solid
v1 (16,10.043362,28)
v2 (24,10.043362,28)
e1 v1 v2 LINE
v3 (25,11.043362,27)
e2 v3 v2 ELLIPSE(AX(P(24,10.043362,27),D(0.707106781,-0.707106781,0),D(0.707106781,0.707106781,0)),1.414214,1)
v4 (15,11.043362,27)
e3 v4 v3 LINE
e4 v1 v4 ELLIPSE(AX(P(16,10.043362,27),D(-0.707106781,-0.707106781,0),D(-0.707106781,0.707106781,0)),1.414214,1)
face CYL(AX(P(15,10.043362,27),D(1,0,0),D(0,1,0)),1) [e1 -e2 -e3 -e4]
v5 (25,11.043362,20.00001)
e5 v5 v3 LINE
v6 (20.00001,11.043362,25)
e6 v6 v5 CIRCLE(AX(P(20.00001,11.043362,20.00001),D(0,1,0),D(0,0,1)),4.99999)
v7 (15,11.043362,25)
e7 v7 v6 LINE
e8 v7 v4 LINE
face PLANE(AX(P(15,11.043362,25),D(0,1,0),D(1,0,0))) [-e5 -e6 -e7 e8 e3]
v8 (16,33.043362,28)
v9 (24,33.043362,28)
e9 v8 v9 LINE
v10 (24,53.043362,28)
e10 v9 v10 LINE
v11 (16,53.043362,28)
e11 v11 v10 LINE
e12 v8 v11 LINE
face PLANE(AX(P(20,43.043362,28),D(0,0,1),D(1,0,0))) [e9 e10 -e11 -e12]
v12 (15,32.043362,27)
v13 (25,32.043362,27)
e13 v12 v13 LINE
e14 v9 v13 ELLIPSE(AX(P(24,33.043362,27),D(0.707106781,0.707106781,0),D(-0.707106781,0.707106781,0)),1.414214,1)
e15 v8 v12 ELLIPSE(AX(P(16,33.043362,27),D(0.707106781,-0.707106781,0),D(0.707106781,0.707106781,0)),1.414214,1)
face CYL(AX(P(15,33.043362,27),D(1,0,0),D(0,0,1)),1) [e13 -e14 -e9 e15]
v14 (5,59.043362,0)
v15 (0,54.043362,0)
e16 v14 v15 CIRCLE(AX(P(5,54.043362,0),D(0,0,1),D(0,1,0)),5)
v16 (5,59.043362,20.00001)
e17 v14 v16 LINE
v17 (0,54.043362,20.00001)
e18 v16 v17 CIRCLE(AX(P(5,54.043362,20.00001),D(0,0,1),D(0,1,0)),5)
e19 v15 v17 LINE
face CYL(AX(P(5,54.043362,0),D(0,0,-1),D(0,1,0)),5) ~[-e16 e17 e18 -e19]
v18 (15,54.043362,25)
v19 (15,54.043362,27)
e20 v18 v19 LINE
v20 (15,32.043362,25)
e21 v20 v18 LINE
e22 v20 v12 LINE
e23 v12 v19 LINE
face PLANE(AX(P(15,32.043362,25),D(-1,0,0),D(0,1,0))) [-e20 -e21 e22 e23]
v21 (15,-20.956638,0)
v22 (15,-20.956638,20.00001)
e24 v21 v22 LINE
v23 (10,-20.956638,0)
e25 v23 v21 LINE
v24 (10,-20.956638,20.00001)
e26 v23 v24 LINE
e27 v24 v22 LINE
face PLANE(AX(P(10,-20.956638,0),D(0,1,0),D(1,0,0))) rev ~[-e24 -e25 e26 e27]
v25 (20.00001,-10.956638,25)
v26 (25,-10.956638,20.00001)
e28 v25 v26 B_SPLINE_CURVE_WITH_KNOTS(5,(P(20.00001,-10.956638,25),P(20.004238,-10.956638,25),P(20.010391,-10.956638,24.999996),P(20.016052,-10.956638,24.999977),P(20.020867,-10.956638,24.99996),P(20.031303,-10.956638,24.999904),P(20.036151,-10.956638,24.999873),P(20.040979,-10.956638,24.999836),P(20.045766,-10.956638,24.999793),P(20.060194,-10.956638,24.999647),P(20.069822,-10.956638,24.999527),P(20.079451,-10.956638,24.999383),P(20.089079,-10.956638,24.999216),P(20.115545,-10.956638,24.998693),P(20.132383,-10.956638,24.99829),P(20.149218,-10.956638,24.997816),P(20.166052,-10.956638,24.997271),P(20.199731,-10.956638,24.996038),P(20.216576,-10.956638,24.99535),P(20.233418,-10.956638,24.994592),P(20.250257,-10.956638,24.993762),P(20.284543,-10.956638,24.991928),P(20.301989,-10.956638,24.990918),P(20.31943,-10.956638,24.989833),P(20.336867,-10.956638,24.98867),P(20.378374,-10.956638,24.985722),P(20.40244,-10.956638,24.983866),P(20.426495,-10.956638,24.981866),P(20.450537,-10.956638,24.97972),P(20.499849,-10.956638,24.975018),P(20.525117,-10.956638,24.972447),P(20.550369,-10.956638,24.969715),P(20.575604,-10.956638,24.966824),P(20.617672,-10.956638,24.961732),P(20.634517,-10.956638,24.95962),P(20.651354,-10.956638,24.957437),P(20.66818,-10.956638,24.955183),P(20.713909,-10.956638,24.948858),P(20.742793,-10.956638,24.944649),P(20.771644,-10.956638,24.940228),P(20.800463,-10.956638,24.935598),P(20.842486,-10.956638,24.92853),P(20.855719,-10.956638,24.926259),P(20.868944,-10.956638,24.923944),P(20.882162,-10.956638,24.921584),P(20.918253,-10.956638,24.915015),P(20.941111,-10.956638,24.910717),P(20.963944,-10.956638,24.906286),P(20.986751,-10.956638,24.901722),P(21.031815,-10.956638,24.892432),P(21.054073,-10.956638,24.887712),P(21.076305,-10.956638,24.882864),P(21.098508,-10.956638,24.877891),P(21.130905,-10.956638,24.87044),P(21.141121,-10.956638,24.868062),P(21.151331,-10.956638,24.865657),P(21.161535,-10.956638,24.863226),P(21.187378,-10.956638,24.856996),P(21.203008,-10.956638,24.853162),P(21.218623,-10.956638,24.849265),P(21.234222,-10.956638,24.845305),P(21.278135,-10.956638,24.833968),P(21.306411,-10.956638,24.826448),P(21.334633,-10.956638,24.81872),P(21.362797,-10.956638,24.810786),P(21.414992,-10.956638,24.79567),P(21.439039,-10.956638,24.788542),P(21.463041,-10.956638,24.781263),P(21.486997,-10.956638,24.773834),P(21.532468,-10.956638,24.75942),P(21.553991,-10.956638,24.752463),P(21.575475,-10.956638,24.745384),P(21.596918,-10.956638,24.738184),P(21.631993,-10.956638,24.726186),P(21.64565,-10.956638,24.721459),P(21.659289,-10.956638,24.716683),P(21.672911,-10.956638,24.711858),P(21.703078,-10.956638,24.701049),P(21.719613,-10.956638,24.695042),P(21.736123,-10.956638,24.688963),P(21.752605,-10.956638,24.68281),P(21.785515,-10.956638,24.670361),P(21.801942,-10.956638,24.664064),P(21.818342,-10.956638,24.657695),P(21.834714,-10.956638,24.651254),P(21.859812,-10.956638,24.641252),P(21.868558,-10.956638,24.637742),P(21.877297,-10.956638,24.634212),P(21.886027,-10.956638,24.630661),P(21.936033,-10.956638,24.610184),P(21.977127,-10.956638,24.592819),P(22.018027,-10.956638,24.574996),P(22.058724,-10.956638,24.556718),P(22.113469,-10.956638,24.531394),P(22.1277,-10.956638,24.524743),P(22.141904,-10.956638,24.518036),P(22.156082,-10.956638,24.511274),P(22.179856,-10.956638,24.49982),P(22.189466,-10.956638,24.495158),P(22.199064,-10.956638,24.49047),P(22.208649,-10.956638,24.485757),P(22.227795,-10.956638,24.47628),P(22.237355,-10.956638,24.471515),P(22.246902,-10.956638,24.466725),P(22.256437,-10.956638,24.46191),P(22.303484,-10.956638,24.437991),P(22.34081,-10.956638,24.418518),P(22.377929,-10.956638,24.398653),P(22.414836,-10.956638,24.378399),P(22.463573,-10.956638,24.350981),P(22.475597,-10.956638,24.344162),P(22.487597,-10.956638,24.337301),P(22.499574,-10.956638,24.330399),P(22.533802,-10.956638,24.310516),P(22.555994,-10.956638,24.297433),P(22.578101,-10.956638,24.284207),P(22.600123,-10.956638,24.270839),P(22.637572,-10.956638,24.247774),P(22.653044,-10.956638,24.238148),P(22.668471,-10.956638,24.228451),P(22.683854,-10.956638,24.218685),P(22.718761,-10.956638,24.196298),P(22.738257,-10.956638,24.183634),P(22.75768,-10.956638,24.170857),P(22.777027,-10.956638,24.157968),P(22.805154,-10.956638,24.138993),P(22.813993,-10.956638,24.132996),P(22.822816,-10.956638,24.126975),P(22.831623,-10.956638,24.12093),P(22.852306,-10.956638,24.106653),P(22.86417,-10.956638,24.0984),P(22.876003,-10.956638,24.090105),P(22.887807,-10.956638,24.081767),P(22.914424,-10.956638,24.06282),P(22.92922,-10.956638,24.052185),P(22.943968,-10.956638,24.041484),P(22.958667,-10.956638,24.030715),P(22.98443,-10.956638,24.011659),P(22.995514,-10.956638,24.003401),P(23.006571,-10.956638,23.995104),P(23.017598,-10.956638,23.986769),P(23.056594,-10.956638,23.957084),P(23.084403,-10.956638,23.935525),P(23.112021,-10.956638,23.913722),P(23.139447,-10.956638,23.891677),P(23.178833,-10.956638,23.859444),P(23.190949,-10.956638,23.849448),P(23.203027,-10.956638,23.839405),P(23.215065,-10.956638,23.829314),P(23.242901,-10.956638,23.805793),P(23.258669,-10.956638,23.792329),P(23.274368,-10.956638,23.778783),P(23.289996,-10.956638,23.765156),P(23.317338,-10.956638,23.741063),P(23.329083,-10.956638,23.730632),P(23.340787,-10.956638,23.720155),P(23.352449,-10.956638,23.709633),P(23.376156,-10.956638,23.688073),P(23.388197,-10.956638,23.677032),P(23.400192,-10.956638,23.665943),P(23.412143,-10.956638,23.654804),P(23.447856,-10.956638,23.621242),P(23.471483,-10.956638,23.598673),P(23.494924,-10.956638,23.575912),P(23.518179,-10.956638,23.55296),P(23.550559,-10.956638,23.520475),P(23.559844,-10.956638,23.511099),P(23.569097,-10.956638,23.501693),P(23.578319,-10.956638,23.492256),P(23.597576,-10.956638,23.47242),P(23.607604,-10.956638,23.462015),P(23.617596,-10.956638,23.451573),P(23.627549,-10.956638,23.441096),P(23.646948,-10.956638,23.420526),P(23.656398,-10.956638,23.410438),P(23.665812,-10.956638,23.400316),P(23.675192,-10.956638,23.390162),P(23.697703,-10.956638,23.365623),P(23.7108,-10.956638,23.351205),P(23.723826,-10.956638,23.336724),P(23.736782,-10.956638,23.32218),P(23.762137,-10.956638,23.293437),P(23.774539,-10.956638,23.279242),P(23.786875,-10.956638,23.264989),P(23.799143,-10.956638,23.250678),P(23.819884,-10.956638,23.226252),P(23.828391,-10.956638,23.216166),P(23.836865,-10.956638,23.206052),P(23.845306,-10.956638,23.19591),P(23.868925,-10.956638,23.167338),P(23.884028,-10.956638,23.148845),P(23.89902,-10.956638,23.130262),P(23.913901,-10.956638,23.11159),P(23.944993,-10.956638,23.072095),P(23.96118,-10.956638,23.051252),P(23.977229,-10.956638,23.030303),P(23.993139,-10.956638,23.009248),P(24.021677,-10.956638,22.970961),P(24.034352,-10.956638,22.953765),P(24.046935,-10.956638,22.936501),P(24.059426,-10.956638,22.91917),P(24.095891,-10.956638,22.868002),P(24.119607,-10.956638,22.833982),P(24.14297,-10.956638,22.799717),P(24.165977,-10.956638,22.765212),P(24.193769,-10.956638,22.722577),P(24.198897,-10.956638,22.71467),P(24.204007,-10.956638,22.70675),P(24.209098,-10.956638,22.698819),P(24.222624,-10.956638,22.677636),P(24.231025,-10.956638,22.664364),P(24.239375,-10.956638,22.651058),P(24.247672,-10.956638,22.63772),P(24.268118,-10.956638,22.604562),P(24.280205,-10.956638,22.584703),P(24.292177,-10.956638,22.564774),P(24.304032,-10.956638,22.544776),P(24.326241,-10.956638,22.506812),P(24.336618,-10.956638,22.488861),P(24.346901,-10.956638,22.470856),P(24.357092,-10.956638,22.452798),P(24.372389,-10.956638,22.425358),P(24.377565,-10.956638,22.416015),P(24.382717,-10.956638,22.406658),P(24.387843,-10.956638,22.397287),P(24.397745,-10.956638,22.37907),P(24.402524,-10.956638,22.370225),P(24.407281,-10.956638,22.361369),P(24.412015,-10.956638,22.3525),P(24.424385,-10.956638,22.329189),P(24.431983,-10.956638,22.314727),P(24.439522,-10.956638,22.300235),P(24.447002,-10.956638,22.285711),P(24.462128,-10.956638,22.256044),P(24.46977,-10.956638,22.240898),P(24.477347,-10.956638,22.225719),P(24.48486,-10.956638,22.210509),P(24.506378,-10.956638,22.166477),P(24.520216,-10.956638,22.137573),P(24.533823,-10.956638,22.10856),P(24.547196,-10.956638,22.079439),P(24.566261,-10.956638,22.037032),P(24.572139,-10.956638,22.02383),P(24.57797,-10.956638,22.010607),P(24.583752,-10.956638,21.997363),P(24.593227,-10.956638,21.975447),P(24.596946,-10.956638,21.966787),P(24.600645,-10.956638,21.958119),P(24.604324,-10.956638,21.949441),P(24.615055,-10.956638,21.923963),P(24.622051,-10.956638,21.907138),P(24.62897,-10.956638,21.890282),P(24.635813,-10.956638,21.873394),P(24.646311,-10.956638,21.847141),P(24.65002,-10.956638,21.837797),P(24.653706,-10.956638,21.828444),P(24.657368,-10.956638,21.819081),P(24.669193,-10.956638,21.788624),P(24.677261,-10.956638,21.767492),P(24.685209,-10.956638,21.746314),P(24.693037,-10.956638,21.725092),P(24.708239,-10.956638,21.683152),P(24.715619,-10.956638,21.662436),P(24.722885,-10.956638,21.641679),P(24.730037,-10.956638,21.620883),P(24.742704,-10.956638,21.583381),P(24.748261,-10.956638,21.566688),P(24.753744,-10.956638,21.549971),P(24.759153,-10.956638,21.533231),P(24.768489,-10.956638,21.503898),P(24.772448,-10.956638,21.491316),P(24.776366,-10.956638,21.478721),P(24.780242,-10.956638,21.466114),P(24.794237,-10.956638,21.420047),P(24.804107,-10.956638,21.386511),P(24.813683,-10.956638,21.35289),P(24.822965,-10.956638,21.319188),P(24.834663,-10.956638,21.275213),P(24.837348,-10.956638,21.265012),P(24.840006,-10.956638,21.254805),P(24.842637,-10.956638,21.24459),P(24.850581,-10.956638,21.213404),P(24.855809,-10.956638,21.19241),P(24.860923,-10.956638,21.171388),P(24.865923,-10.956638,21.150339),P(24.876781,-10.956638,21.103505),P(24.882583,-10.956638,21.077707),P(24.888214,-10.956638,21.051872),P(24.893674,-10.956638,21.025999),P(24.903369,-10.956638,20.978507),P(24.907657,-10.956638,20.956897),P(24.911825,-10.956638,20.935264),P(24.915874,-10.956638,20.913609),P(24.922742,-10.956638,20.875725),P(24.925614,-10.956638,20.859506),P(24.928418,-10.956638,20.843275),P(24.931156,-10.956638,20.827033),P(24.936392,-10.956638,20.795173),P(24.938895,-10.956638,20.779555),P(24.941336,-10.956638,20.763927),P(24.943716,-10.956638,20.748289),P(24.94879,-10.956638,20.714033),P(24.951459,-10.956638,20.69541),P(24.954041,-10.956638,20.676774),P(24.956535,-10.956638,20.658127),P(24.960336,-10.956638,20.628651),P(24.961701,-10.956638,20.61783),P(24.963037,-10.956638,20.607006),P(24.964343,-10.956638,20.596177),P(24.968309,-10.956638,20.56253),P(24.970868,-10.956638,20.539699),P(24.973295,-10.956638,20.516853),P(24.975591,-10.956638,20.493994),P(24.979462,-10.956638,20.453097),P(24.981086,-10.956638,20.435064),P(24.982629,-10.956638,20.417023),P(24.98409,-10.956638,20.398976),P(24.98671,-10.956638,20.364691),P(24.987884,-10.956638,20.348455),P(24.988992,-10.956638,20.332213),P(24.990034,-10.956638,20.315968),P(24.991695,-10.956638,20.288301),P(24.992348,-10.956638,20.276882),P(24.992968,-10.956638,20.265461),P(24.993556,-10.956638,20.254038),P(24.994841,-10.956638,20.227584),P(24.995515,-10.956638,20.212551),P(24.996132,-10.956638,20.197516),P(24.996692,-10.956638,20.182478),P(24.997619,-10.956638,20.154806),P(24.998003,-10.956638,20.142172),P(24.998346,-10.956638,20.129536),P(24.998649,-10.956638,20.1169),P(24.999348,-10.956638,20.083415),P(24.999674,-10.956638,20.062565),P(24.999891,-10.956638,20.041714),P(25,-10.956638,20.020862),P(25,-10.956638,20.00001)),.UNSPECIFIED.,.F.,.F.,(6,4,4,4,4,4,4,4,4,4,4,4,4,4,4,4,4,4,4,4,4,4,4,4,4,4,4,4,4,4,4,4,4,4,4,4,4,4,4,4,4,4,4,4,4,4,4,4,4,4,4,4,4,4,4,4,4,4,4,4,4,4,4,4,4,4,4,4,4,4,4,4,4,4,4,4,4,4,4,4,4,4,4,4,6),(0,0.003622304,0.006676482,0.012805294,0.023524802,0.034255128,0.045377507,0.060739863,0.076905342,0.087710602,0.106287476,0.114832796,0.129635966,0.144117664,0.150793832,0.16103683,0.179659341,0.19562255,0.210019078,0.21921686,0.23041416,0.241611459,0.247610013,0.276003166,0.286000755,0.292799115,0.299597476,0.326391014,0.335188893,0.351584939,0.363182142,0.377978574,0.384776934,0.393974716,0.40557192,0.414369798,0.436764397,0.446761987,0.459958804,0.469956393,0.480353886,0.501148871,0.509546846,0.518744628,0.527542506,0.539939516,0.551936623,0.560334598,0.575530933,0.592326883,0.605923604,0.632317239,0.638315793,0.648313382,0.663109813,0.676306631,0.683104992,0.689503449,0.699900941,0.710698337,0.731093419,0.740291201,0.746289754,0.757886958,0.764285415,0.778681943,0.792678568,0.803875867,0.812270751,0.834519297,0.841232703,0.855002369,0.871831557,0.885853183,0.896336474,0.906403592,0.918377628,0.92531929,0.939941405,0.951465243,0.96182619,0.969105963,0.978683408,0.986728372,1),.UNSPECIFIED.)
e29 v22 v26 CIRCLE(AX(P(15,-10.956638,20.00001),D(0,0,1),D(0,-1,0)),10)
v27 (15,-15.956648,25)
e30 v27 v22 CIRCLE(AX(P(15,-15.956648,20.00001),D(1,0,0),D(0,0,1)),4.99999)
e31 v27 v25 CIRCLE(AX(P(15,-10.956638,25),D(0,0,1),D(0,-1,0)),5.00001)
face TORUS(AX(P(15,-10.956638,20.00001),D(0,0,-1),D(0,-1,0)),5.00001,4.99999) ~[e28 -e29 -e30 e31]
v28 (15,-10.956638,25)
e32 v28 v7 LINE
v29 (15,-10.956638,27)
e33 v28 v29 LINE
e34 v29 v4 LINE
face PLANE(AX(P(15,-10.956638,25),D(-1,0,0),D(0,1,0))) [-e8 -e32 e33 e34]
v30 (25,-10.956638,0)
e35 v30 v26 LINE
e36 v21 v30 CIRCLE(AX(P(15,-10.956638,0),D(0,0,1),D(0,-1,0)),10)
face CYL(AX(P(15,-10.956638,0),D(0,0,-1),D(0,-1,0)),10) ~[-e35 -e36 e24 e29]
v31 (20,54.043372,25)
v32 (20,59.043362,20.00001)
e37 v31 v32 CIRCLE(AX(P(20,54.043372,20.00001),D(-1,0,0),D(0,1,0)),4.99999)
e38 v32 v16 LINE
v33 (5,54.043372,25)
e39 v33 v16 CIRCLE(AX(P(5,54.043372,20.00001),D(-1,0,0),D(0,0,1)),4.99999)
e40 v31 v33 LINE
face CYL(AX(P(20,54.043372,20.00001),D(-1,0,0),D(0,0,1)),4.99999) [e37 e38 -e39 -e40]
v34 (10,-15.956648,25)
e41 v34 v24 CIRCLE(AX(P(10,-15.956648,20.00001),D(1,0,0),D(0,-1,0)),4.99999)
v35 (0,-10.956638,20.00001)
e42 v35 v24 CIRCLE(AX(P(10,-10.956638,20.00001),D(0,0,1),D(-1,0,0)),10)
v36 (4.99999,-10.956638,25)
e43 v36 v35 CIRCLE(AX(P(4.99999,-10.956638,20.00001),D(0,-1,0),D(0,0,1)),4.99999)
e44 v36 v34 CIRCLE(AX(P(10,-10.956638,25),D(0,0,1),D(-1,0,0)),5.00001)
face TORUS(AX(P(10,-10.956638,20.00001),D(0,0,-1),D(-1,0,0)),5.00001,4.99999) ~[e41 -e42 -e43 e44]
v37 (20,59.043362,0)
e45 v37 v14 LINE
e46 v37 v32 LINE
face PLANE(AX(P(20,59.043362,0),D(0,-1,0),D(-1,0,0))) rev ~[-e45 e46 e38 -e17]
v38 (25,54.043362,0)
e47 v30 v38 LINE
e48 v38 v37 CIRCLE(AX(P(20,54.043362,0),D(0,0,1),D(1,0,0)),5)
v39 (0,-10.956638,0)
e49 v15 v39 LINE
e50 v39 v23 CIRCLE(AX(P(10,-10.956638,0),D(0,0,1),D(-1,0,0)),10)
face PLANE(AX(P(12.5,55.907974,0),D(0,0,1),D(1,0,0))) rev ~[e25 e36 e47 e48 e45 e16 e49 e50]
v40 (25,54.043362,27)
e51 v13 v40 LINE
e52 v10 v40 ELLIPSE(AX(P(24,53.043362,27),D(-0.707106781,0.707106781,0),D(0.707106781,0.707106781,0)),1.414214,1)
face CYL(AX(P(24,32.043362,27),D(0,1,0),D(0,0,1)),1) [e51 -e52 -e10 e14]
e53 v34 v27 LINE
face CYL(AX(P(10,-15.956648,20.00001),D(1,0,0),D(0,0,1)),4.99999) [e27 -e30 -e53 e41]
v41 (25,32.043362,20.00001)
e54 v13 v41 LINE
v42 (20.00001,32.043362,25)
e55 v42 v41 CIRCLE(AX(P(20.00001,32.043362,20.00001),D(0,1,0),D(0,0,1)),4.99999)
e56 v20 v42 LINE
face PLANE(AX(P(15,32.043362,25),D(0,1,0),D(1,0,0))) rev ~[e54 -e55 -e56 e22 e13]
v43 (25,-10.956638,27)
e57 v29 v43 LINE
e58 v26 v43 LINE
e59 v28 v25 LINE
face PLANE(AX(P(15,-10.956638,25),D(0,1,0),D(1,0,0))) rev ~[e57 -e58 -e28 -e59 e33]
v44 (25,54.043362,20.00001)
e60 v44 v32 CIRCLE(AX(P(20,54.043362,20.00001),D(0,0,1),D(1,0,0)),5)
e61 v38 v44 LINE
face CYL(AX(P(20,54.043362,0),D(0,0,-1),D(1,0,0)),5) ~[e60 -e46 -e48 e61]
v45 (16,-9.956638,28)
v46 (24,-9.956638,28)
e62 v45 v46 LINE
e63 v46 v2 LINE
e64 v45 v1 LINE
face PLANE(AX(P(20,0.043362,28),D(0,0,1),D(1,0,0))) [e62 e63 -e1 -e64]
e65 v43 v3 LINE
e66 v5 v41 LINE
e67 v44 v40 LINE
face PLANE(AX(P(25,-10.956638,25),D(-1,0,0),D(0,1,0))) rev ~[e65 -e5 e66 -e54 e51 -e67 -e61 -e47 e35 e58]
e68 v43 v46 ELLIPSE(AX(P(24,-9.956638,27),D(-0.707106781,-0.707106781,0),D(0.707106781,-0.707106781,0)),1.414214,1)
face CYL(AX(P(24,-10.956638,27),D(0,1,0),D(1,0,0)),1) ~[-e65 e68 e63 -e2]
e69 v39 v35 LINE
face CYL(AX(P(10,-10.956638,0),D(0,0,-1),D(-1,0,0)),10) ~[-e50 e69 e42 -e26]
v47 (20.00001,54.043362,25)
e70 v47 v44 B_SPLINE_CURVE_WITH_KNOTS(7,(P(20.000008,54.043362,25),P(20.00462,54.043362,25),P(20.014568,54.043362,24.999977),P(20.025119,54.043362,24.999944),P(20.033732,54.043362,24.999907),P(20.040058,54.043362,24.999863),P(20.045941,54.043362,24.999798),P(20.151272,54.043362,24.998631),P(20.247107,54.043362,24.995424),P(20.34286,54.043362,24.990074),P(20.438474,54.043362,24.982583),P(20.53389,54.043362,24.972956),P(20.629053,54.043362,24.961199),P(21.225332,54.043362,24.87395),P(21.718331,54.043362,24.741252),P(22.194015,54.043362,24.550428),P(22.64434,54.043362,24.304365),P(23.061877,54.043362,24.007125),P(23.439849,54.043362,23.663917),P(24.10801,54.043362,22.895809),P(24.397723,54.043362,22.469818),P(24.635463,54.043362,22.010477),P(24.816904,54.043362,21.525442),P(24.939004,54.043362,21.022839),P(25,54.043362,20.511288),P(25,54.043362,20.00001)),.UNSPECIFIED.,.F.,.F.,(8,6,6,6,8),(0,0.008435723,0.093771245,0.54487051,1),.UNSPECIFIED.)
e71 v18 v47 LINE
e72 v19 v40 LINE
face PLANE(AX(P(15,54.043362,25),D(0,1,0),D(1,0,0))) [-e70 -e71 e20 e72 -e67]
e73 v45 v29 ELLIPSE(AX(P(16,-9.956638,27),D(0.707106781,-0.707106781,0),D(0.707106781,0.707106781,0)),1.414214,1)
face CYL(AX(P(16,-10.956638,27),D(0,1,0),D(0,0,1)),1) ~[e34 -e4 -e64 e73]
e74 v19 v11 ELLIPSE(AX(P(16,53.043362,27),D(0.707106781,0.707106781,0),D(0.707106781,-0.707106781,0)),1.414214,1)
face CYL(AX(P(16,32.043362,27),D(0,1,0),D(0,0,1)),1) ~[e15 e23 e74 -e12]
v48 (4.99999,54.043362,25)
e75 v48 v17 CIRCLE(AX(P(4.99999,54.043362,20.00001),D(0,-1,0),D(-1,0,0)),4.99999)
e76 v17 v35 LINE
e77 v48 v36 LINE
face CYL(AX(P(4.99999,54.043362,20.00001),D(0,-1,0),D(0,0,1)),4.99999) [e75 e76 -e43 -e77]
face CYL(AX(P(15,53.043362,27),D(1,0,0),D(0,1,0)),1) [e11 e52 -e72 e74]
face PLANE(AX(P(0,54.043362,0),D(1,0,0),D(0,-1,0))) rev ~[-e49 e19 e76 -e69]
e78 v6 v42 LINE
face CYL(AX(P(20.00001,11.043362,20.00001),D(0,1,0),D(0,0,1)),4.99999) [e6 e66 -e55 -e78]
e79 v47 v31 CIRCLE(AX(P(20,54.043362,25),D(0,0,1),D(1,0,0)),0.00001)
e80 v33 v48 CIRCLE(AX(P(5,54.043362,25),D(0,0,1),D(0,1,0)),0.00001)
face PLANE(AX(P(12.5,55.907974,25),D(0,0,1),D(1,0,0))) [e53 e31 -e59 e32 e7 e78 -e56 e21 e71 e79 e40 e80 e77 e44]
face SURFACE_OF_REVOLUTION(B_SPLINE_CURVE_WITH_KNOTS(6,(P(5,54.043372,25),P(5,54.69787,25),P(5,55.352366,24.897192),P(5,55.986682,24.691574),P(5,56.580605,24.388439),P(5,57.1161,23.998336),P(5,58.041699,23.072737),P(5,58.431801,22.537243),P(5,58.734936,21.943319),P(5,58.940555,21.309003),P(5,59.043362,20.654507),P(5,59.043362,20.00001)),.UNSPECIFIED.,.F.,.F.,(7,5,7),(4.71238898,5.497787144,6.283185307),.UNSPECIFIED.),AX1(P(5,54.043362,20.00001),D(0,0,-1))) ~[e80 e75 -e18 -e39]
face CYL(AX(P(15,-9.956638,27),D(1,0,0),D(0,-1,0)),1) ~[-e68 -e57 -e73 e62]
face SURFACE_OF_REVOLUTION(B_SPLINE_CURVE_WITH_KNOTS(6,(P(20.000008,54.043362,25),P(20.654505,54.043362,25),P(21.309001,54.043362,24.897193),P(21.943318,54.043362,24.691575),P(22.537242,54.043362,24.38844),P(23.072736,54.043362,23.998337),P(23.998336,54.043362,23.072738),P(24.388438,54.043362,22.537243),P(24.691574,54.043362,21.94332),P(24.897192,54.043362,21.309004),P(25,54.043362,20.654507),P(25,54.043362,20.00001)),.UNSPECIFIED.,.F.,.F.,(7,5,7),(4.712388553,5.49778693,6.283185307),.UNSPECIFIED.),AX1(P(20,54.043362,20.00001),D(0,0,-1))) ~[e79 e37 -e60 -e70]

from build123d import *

# Parameters (mm, degrees)
F1_DEPTH = 25
F2_W     = 10
F2_H     = 22
F3_DEPTH = 3
F4_R     = 4.99999
F5_R     = 1


# Not quite as in the source:
# - a fillet or chamfer is up to 0.001 mm smaller than in the source, because OpenCascade refuses the exact size


with BuildPart() as f1:
    # F0 (on Top) → F1 (new body)
    with BuildSketch(Plane.XY):
        with BuildLine():
            Line((0, 54.0433624494), (0, 53.3714158042))
            Line((0, 53.3714158042), (25, 53.3714158042))
            Line((25, 53.3714158042), (25, 54.0433624494))
            ThreePointArc((25, 54.0433624494), (23.5355339059, 57.5788963554), (20, 59.0433624494))
            Line((20, 59.0433624494), (5, 59.0433624494))
            ThreePointArc((5, 59.0433624494), (1.4644660941, 57.5788963554), (0, 54.0433624494))
        make_face()
        with BuildLine():
            Line((25, 53.3714158042), (0, 53.3714158042))
            Line((0, 53.3714158042), (0, -10.9566375506))
            ThreePointArc((0, -10.9566375506), (2.9289321881, -18.0277053624), (10, -20.9566375506))
            Line((10, -20.9566375506), (15, -20.9566375506))
            ThreePointArc((15, -20.9566375506), (22.0710678119, -18.0277053624), (25, -10.9566375506))
            Line((25, -10.9566375506), (25, 53.3714158042))
        make_face()
    extrude(amount=F1_DEPTH)

    # F2 (on face) → F3 (join)
    with BuildSketch(Plane.XY.offset(25)):
        with Locations((20, 0.0433624494)):
            Rectangle(F2_W, F2_H)
        with Locations((20, 43.0433624494)):
            Rectangle(F2_W, F2_H)
    extrude(amount=F3_DEPTH)

    # F4 (radius 5 in the source; OpenCascade refuses exactly that, so slightly less here)
    f4_edges = [f1.edges().sort_by_distance(p)[0] for p in [
        (25, 21.543362, 25),
        (0, 21.543362, 25),
    ]]
    fillet(f4_edges, radius=F4_R)

    # F5
    f5_edges = [f1.edges().sort_by_distance(p)[0] for p in [
        (15, 0.043362, 28),
        (20, -10.956638, 28),
        (25, 0.043362, 28),
        (20, 11.043362, 28),
        (25, 43.043362, 28),
        (20, 54.043362, 28),
        (15, 43.043362, 28),
        (20, 32.043362, 28),
    ]]
    fillet(f5_edges, radius=F5_R)


solid = f1.part
